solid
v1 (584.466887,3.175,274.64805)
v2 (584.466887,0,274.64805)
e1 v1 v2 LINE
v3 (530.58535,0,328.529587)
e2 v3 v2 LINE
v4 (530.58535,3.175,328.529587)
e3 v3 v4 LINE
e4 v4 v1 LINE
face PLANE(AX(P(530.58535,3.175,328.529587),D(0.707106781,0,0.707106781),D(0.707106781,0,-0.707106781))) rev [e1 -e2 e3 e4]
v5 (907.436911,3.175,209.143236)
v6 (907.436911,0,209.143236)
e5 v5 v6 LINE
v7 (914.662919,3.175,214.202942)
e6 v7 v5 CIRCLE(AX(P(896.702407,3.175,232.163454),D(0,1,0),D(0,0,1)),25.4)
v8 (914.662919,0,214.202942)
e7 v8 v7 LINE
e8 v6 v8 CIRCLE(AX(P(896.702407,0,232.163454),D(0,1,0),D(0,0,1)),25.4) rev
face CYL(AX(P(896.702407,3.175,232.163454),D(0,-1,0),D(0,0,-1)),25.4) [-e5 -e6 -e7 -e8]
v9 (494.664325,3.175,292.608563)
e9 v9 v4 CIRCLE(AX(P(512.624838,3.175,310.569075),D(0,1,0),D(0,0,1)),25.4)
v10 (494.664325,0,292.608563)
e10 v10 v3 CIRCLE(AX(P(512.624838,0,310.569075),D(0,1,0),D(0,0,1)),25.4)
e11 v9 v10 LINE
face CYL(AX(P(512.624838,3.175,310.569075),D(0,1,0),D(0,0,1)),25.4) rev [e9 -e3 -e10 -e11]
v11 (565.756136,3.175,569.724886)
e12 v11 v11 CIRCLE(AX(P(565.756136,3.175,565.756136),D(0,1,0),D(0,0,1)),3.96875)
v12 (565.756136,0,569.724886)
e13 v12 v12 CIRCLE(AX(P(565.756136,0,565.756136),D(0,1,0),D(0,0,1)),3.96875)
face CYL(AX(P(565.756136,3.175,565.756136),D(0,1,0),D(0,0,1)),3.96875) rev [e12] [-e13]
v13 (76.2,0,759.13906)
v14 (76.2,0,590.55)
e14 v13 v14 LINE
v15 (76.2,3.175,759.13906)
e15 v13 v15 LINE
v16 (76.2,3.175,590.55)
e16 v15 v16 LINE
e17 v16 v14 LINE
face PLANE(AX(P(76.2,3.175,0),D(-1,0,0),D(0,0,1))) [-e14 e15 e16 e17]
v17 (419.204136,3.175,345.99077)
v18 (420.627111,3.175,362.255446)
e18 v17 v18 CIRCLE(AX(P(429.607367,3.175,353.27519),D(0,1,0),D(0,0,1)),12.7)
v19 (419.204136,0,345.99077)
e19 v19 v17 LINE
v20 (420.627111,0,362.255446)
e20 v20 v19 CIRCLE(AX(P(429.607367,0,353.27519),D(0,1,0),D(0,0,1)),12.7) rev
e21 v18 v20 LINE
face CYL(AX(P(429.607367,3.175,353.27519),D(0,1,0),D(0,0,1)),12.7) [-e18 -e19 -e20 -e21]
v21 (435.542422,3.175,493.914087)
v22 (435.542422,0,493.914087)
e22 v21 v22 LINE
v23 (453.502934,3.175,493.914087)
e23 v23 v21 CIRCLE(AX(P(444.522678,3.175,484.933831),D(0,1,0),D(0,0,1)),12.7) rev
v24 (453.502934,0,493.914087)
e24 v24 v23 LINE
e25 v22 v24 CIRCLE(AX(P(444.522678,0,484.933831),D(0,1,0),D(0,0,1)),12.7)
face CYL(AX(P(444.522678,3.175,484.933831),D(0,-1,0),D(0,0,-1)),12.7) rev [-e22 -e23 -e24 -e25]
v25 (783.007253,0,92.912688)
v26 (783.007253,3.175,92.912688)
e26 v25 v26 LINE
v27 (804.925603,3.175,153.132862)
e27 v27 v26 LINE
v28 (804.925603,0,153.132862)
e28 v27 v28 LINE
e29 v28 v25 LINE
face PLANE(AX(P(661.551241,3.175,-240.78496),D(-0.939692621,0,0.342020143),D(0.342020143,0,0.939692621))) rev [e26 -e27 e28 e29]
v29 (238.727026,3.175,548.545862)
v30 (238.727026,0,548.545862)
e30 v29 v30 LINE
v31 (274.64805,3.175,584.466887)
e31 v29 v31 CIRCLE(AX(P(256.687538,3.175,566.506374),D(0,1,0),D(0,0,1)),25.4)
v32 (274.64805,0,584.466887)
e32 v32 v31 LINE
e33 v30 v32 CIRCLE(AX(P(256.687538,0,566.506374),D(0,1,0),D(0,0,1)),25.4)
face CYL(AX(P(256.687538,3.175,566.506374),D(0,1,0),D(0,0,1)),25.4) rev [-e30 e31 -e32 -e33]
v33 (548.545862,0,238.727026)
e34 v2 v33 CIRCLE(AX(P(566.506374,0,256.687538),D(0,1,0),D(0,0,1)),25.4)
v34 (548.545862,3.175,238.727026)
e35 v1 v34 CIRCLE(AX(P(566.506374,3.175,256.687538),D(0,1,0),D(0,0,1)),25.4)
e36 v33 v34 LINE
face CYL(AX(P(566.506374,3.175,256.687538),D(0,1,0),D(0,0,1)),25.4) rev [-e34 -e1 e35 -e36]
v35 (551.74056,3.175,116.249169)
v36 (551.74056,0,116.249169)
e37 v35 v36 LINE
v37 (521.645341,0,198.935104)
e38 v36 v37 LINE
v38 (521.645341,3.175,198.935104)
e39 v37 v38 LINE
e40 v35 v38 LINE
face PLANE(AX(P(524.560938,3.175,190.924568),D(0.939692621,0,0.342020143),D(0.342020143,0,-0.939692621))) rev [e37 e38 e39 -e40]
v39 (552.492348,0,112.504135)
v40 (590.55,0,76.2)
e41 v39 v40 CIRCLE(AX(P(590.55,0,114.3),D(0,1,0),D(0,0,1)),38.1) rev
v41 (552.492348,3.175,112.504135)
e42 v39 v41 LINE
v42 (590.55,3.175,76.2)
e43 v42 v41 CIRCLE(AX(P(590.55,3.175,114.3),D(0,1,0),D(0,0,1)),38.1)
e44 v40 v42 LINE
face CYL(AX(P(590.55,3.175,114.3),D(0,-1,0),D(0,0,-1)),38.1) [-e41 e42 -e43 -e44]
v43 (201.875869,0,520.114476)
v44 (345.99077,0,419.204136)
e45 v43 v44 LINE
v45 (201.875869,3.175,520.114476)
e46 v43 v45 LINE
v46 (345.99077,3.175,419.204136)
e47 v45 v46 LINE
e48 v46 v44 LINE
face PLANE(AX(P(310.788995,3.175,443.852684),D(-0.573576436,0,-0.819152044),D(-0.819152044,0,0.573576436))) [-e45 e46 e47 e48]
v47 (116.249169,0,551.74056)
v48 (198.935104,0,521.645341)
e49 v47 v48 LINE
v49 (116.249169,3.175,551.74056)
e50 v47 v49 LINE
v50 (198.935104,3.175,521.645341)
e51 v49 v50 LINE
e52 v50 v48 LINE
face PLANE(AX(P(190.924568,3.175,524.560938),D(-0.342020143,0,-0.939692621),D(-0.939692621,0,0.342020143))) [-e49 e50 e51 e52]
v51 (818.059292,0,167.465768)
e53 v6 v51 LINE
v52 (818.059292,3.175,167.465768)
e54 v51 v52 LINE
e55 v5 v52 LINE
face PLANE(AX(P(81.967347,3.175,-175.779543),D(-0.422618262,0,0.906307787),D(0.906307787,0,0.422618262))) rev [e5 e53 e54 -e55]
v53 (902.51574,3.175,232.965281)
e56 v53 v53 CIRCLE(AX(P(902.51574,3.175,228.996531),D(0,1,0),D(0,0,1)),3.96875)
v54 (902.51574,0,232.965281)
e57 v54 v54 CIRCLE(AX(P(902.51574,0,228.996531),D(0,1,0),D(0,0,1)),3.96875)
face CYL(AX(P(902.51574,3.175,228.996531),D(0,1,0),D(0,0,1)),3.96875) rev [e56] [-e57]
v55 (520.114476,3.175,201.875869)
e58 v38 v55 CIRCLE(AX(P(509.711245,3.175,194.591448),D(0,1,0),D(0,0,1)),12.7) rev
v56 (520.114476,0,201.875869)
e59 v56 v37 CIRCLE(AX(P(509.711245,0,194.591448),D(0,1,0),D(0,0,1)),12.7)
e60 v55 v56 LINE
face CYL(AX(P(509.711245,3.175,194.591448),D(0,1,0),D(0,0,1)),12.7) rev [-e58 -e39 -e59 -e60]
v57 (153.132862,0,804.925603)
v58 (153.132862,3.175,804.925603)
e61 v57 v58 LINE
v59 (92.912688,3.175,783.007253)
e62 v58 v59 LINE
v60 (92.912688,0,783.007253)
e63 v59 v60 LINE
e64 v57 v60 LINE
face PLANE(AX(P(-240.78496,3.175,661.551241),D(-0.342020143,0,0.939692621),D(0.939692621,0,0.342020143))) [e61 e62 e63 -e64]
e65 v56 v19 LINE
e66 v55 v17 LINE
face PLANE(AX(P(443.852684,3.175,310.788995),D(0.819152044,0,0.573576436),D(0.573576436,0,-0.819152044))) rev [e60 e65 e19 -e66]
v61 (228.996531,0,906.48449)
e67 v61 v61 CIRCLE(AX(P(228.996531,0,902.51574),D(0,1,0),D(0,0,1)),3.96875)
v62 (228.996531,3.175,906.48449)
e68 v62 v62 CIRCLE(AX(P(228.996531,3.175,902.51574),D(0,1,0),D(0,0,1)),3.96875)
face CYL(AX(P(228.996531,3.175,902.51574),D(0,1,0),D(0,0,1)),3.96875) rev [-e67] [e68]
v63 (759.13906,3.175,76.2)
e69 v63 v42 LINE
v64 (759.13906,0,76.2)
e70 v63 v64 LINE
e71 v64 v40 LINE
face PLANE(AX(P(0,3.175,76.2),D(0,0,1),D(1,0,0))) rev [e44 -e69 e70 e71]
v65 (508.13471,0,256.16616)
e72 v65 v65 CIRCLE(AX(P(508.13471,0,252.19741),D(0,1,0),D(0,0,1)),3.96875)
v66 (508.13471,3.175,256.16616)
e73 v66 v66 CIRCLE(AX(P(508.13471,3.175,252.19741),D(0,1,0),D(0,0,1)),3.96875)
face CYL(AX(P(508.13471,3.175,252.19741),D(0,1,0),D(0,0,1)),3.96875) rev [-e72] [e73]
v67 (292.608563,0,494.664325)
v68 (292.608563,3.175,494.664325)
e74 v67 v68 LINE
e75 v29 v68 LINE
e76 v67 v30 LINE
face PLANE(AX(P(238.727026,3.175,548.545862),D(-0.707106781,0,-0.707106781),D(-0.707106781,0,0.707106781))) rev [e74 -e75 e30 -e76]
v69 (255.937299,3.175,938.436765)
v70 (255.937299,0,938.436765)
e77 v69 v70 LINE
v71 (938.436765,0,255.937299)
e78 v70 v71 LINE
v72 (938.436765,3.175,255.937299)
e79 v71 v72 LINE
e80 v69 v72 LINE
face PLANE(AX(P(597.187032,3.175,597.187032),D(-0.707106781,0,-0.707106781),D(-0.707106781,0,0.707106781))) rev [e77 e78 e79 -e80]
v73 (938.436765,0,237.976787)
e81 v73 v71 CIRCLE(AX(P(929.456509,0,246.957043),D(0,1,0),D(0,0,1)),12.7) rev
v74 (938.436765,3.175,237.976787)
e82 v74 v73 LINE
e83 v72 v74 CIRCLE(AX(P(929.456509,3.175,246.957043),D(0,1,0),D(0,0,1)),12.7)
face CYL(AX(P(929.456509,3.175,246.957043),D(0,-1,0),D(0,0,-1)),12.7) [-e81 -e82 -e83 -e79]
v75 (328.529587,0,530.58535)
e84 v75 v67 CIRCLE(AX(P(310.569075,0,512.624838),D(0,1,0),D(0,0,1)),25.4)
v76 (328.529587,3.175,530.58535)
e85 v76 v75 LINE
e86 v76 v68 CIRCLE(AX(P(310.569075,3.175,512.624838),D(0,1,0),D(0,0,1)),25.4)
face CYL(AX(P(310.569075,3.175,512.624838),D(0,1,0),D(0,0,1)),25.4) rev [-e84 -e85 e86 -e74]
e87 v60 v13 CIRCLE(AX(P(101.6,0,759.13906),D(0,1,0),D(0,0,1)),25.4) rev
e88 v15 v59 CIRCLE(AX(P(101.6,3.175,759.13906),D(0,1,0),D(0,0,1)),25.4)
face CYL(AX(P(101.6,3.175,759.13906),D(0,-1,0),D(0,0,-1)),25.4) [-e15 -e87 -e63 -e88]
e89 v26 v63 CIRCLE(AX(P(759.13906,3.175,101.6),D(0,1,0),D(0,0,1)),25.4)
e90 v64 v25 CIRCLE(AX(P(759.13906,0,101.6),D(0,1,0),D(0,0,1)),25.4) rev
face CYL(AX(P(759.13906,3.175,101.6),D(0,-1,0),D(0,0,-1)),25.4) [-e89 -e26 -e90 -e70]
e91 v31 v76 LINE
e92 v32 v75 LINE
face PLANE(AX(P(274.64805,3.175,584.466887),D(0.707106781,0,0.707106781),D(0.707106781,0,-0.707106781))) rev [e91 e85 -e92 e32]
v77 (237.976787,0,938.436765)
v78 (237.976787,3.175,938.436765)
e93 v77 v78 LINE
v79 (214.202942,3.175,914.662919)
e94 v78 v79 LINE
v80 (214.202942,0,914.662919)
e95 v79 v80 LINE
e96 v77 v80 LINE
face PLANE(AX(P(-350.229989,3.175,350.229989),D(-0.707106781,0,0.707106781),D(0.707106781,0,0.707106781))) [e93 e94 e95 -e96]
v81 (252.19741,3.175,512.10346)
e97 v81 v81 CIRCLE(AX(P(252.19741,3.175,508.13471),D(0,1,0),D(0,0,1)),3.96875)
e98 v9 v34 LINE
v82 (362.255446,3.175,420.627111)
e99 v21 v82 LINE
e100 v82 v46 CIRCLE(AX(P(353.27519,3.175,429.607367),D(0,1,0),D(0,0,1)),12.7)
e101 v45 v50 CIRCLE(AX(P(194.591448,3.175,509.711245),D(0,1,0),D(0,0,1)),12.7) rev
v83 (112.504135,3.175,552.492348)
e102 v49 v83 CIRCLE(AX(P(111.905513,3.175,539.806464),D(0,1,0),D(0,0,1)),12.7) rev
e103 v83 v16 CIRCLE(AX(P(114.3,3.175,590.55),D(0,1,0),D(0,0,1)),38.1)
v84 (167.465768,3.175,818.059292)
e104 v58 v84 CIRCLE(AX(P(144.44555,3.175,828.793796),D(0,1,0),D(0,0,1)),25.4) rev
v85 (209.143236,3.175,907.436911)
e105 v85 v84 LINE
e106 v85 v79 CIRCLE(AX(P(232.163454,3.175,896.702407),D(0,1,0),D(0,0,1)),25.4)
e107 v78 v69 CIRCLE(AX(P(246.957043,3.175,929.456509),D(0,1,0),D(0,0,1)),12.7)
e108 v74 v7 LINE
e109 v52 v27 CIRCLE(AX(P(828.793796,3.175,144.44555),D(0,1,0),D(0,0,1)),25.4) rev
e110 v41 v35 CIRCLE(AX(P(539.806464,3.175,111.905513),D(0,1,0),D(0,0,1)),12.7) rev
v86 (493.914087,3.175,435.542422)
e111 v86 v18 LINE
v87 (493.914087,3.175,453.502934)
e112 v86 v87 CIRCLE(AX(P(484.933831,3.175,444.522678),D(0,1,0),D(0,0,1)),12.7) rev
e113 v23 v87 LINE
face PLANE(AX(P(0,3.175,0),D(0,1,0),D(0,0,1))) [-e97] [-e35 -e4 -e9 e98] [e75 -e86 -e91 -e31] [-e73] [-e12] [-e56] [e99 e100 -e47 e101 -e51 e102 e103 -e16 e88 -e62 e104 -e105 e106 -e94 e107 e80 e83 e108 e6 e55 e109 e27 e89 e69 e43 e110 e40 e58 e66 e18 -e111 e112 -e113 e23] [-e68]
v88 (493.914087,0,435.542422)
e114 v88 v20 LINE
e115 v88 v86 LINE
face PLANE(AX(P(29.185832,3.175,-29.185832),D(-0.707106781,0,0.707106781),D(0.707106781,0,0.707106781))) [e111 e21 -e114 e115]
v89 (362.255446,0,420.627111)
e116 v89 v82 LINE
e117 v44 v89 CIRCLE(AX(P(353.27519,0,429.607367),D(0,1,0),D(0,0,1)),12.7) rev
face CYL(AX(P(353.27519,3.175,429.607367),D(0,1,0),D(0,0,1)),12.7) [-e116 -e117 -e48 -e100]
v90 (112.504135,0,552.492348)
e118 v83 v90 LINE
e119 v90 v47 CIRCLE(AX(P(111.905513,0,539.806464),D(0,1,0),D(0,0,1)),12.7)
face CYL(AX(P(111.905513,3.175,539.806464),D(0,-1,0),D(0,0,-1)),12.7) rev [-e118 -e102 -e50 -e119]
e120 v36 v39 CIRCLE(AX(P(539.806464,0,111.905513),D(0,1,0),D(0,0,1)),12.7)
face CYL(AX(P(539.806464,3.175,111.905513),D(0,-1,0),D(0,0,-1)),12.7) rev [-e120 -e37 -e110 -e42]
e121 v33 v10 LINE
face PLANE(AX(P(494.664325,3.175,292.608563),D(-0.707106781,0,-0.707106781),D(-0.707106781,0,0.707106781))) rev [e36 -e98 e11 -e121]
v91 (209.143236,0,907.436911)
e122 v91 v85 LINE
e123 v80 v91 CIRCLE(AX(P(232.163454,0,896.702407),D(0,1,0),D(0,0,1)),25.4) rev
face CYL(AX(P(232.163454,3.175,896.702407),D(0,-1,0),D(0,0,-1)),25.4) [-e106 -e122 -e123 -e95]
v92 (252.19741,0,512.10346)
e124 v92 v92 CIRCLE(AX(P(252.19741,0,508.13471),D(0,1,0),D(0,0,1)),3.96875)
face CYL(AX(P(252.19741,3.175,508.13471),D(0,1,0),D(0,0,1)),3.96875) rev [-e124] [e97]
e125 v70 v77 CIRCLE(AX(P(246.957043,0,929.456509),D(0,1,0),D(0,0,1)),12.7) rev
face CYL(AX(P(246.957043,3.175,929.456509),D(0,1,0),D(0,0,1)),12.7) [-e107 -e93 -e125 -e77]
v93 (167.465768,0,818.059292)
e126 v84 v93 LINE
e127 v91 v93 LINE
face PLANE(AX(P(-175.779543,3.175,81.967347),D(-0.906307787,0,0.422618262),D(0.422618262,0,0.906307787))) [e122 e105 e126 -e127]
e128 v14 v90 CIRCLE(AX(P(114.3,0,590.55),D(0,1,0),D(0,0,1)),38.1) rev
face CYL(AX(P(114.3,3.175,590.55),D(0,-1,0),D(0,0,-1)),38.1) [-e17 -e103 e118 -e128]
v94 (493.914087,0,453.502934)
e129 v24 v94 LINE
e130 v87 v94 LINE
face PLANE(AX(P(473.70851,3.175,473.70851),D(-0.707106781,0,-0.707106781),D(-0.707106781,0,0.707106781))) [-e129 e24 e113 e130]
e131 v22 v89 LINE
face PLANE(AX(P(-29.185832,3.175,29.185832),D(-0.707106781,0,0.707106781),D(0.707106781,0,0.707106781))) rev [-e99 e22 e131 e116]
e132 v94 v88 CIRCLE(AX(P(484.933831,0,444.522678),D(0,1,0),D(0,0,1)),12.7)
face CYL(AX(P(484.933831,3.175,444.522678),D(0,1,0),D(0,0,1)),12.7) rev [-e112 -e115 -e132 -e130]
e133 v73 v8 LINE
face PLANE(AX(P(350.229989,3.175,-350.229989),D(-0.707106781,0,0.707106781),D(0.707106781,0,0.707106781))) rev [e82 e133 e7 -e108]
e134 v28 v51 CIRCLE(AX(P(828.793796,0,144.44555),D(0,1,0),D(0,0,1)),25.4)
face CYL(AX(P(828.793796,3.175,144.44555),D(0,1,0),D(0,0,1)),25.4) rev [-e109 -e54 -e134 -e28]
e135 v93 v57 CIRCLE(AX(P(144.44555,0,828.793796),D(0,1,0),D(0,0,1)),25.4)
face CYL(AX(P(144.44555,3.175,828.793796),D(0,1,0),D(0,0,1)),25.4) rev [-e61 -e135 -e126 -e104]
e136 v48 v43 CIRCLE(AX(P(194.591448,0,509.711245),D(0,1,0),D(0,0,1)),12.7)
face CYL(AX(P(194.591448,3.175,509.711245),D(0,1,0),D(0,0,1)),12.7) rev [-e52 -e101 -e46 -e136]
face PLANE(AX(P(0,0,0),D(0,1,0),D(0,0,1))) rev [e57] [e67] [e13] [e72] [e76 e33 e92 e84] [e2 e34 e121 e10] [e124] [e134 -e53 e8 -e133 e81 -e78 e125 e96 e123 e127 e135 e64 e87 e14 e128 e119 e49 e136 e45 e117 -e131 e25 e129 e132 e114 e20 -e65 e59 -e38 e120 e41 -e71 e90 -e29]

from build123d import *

# Parameters (mm, degrees)
BOSS_EXTRUDE1_DEPTH         = 3.175
FILLET3_R                   = 38.1
F_5_16_0_3125_DOWEL_HOLE1_D = 7.9375
F_1_2_DOWEL_SLOT1_DEPTH     = 3.175
FILLET4_R                   = 25.4
FILLET6_R                   = 12.7


# Read off the part's stored shape, not the designer's step: 1 (2) Dowel Slot1
with BuildPart() as part:
    # Sketch1 → Boss-Extrude1 (new body)
    with BuildSketch(Plane(origin=(0, 0, 0), x_dir=(1, 0, 0), z_dir=(0, 1, 0))):
        Polygon((246.957043329, -947.417020773), (947.417020773, -246.957043329), (911.495996289, -211.036018845), (808.524005584, -163.019391004), (776.924331502, -76.2), (552.45, -76.2), (552.45, -114.3), (521.073488184, -200.506257716), (413.091781569, -354.720116782), (502.89434278, -444.522677993), (444.522677993, -502.89434278), (354.720116782, -413.091781569), (200.506257716, -521.073488184), (114.3, -552.45), (76.2, -552.45), (76.2, -776.924331502), (163.019391004, -808.524005584), (211.036018845, -911.495996289), align=None)
    extrude(amount=BOSS_EXTRUDE1_DEPTH)

    # Fillet3
    fillet3_edges = [part.edges().sort_by_distance(p)[0] for p in [
        (76.2, 1.5875, 552.45),
        (552.45, 1.5875, 76.2),
    ]]
    fillet(fillet3_edges, radius=FILLET3_R - 0.0001)  # a hair under: the kernel refuses the full size

    # 5/16 (0.3125) Dowel Hole1 (through all)
    with Locations(Plane(origin=(0, 3.175, 0), x_dir=(1, 0, 0), z_dir=(0, 1, 0))):
        with Locations((252.197410095, -508.134709545), (508.134709545, -252.197410095), (902.515740167, -228.996531087), (228.996531087, -902.515740167), (565.756135627, -565.756135627)):
            Hole(F_5_16_0_3125_DOWEL_HOLE1_D / 2)

    # 1 (2) Dowel Slot1 outline → 1 (2) Dowel Slot1 (cut)
    with BuildSketch(Plane(origin=(0, 0, 0), x_dir=(1, 0, 0), z_dir=(0, 1, 0))):
        with BuildLine():
            Line((530.585349848, -328.529587124), (584.466886574, -274.648050397))
            ThreePointArc((584.466886574, -274.648050397), (584.466886574, -238.727025913), (548.54586209, -238.727025913))
            Line((548.54586209, -238.727025913), (494.664325364, -292.60856264))
            ThreePointArc((494.664325364, -292.60856264), (494.664325364, -328.529587124), (530.585349848, -328.529587124))
        make_face()
        with BuildLine():
            ThreePointArc((328.529587124, -530.585349848), (328.529587124, -494.664325364), (292.60856264, -494.664325364))
            Line((292.60856264, -494.664325364), (238.727025913, -548.54586209))
            ThreePointArc((238.727025913, -548.54586209), (238.727025913, -584.466886574), (274.648050397, -584.466886574))
            Line((274.648050397, -584.466886574), (328.529587124, -530.585349848))
        make_face()
    extrude(amount=F_1_2_DOWEL_SLOT1_DEPTH, mode=Mode.SUBTRACT)

    # Fillet4
    fillet4_edges = [part.edges().sort_by_distance(p)[0] for p in [
        (211.036018845, 1.5875, 911.495996289),
        (163.019391004, 1.5875, 808.524005584),
        (76.2, 1.5875, 776.924331502),
        (776.924331502, 1.5875, 76.2),
        (808.524005584, 1.5875, 163.019391004),
        (911.495996289, 1.5875, 211.036018845),
    ]]
    fillet(fillet4_edges, radius=FILLET4_R)

    # Fillet6
    fillet6_edges = [part.edges().sort_by_distance(p)[0] for p in [
        (947.417020773, 1.5875, 246.957043329),
        (246.957043329, 1.5875, 947.417020773),
        (114.3, 1.5875, 552.45),
        (200.506257716, 1.5875, 521.073488184),
        (354.720116782, 1.5875, 413.091781569),
        (444.522677993, 1.5875, 502.89434278),
        (502.89434278, 1.5875, 444.522677993),
        (413.091781569, 1.5875, 354.720116782),
        (521.073488184, 1.5875, 200.506257716),
        (552.45, 1.5875, 114.3),
    ]]
    fillet(fillet6_edges, radius=FILLET6_R)


solid = part.part
